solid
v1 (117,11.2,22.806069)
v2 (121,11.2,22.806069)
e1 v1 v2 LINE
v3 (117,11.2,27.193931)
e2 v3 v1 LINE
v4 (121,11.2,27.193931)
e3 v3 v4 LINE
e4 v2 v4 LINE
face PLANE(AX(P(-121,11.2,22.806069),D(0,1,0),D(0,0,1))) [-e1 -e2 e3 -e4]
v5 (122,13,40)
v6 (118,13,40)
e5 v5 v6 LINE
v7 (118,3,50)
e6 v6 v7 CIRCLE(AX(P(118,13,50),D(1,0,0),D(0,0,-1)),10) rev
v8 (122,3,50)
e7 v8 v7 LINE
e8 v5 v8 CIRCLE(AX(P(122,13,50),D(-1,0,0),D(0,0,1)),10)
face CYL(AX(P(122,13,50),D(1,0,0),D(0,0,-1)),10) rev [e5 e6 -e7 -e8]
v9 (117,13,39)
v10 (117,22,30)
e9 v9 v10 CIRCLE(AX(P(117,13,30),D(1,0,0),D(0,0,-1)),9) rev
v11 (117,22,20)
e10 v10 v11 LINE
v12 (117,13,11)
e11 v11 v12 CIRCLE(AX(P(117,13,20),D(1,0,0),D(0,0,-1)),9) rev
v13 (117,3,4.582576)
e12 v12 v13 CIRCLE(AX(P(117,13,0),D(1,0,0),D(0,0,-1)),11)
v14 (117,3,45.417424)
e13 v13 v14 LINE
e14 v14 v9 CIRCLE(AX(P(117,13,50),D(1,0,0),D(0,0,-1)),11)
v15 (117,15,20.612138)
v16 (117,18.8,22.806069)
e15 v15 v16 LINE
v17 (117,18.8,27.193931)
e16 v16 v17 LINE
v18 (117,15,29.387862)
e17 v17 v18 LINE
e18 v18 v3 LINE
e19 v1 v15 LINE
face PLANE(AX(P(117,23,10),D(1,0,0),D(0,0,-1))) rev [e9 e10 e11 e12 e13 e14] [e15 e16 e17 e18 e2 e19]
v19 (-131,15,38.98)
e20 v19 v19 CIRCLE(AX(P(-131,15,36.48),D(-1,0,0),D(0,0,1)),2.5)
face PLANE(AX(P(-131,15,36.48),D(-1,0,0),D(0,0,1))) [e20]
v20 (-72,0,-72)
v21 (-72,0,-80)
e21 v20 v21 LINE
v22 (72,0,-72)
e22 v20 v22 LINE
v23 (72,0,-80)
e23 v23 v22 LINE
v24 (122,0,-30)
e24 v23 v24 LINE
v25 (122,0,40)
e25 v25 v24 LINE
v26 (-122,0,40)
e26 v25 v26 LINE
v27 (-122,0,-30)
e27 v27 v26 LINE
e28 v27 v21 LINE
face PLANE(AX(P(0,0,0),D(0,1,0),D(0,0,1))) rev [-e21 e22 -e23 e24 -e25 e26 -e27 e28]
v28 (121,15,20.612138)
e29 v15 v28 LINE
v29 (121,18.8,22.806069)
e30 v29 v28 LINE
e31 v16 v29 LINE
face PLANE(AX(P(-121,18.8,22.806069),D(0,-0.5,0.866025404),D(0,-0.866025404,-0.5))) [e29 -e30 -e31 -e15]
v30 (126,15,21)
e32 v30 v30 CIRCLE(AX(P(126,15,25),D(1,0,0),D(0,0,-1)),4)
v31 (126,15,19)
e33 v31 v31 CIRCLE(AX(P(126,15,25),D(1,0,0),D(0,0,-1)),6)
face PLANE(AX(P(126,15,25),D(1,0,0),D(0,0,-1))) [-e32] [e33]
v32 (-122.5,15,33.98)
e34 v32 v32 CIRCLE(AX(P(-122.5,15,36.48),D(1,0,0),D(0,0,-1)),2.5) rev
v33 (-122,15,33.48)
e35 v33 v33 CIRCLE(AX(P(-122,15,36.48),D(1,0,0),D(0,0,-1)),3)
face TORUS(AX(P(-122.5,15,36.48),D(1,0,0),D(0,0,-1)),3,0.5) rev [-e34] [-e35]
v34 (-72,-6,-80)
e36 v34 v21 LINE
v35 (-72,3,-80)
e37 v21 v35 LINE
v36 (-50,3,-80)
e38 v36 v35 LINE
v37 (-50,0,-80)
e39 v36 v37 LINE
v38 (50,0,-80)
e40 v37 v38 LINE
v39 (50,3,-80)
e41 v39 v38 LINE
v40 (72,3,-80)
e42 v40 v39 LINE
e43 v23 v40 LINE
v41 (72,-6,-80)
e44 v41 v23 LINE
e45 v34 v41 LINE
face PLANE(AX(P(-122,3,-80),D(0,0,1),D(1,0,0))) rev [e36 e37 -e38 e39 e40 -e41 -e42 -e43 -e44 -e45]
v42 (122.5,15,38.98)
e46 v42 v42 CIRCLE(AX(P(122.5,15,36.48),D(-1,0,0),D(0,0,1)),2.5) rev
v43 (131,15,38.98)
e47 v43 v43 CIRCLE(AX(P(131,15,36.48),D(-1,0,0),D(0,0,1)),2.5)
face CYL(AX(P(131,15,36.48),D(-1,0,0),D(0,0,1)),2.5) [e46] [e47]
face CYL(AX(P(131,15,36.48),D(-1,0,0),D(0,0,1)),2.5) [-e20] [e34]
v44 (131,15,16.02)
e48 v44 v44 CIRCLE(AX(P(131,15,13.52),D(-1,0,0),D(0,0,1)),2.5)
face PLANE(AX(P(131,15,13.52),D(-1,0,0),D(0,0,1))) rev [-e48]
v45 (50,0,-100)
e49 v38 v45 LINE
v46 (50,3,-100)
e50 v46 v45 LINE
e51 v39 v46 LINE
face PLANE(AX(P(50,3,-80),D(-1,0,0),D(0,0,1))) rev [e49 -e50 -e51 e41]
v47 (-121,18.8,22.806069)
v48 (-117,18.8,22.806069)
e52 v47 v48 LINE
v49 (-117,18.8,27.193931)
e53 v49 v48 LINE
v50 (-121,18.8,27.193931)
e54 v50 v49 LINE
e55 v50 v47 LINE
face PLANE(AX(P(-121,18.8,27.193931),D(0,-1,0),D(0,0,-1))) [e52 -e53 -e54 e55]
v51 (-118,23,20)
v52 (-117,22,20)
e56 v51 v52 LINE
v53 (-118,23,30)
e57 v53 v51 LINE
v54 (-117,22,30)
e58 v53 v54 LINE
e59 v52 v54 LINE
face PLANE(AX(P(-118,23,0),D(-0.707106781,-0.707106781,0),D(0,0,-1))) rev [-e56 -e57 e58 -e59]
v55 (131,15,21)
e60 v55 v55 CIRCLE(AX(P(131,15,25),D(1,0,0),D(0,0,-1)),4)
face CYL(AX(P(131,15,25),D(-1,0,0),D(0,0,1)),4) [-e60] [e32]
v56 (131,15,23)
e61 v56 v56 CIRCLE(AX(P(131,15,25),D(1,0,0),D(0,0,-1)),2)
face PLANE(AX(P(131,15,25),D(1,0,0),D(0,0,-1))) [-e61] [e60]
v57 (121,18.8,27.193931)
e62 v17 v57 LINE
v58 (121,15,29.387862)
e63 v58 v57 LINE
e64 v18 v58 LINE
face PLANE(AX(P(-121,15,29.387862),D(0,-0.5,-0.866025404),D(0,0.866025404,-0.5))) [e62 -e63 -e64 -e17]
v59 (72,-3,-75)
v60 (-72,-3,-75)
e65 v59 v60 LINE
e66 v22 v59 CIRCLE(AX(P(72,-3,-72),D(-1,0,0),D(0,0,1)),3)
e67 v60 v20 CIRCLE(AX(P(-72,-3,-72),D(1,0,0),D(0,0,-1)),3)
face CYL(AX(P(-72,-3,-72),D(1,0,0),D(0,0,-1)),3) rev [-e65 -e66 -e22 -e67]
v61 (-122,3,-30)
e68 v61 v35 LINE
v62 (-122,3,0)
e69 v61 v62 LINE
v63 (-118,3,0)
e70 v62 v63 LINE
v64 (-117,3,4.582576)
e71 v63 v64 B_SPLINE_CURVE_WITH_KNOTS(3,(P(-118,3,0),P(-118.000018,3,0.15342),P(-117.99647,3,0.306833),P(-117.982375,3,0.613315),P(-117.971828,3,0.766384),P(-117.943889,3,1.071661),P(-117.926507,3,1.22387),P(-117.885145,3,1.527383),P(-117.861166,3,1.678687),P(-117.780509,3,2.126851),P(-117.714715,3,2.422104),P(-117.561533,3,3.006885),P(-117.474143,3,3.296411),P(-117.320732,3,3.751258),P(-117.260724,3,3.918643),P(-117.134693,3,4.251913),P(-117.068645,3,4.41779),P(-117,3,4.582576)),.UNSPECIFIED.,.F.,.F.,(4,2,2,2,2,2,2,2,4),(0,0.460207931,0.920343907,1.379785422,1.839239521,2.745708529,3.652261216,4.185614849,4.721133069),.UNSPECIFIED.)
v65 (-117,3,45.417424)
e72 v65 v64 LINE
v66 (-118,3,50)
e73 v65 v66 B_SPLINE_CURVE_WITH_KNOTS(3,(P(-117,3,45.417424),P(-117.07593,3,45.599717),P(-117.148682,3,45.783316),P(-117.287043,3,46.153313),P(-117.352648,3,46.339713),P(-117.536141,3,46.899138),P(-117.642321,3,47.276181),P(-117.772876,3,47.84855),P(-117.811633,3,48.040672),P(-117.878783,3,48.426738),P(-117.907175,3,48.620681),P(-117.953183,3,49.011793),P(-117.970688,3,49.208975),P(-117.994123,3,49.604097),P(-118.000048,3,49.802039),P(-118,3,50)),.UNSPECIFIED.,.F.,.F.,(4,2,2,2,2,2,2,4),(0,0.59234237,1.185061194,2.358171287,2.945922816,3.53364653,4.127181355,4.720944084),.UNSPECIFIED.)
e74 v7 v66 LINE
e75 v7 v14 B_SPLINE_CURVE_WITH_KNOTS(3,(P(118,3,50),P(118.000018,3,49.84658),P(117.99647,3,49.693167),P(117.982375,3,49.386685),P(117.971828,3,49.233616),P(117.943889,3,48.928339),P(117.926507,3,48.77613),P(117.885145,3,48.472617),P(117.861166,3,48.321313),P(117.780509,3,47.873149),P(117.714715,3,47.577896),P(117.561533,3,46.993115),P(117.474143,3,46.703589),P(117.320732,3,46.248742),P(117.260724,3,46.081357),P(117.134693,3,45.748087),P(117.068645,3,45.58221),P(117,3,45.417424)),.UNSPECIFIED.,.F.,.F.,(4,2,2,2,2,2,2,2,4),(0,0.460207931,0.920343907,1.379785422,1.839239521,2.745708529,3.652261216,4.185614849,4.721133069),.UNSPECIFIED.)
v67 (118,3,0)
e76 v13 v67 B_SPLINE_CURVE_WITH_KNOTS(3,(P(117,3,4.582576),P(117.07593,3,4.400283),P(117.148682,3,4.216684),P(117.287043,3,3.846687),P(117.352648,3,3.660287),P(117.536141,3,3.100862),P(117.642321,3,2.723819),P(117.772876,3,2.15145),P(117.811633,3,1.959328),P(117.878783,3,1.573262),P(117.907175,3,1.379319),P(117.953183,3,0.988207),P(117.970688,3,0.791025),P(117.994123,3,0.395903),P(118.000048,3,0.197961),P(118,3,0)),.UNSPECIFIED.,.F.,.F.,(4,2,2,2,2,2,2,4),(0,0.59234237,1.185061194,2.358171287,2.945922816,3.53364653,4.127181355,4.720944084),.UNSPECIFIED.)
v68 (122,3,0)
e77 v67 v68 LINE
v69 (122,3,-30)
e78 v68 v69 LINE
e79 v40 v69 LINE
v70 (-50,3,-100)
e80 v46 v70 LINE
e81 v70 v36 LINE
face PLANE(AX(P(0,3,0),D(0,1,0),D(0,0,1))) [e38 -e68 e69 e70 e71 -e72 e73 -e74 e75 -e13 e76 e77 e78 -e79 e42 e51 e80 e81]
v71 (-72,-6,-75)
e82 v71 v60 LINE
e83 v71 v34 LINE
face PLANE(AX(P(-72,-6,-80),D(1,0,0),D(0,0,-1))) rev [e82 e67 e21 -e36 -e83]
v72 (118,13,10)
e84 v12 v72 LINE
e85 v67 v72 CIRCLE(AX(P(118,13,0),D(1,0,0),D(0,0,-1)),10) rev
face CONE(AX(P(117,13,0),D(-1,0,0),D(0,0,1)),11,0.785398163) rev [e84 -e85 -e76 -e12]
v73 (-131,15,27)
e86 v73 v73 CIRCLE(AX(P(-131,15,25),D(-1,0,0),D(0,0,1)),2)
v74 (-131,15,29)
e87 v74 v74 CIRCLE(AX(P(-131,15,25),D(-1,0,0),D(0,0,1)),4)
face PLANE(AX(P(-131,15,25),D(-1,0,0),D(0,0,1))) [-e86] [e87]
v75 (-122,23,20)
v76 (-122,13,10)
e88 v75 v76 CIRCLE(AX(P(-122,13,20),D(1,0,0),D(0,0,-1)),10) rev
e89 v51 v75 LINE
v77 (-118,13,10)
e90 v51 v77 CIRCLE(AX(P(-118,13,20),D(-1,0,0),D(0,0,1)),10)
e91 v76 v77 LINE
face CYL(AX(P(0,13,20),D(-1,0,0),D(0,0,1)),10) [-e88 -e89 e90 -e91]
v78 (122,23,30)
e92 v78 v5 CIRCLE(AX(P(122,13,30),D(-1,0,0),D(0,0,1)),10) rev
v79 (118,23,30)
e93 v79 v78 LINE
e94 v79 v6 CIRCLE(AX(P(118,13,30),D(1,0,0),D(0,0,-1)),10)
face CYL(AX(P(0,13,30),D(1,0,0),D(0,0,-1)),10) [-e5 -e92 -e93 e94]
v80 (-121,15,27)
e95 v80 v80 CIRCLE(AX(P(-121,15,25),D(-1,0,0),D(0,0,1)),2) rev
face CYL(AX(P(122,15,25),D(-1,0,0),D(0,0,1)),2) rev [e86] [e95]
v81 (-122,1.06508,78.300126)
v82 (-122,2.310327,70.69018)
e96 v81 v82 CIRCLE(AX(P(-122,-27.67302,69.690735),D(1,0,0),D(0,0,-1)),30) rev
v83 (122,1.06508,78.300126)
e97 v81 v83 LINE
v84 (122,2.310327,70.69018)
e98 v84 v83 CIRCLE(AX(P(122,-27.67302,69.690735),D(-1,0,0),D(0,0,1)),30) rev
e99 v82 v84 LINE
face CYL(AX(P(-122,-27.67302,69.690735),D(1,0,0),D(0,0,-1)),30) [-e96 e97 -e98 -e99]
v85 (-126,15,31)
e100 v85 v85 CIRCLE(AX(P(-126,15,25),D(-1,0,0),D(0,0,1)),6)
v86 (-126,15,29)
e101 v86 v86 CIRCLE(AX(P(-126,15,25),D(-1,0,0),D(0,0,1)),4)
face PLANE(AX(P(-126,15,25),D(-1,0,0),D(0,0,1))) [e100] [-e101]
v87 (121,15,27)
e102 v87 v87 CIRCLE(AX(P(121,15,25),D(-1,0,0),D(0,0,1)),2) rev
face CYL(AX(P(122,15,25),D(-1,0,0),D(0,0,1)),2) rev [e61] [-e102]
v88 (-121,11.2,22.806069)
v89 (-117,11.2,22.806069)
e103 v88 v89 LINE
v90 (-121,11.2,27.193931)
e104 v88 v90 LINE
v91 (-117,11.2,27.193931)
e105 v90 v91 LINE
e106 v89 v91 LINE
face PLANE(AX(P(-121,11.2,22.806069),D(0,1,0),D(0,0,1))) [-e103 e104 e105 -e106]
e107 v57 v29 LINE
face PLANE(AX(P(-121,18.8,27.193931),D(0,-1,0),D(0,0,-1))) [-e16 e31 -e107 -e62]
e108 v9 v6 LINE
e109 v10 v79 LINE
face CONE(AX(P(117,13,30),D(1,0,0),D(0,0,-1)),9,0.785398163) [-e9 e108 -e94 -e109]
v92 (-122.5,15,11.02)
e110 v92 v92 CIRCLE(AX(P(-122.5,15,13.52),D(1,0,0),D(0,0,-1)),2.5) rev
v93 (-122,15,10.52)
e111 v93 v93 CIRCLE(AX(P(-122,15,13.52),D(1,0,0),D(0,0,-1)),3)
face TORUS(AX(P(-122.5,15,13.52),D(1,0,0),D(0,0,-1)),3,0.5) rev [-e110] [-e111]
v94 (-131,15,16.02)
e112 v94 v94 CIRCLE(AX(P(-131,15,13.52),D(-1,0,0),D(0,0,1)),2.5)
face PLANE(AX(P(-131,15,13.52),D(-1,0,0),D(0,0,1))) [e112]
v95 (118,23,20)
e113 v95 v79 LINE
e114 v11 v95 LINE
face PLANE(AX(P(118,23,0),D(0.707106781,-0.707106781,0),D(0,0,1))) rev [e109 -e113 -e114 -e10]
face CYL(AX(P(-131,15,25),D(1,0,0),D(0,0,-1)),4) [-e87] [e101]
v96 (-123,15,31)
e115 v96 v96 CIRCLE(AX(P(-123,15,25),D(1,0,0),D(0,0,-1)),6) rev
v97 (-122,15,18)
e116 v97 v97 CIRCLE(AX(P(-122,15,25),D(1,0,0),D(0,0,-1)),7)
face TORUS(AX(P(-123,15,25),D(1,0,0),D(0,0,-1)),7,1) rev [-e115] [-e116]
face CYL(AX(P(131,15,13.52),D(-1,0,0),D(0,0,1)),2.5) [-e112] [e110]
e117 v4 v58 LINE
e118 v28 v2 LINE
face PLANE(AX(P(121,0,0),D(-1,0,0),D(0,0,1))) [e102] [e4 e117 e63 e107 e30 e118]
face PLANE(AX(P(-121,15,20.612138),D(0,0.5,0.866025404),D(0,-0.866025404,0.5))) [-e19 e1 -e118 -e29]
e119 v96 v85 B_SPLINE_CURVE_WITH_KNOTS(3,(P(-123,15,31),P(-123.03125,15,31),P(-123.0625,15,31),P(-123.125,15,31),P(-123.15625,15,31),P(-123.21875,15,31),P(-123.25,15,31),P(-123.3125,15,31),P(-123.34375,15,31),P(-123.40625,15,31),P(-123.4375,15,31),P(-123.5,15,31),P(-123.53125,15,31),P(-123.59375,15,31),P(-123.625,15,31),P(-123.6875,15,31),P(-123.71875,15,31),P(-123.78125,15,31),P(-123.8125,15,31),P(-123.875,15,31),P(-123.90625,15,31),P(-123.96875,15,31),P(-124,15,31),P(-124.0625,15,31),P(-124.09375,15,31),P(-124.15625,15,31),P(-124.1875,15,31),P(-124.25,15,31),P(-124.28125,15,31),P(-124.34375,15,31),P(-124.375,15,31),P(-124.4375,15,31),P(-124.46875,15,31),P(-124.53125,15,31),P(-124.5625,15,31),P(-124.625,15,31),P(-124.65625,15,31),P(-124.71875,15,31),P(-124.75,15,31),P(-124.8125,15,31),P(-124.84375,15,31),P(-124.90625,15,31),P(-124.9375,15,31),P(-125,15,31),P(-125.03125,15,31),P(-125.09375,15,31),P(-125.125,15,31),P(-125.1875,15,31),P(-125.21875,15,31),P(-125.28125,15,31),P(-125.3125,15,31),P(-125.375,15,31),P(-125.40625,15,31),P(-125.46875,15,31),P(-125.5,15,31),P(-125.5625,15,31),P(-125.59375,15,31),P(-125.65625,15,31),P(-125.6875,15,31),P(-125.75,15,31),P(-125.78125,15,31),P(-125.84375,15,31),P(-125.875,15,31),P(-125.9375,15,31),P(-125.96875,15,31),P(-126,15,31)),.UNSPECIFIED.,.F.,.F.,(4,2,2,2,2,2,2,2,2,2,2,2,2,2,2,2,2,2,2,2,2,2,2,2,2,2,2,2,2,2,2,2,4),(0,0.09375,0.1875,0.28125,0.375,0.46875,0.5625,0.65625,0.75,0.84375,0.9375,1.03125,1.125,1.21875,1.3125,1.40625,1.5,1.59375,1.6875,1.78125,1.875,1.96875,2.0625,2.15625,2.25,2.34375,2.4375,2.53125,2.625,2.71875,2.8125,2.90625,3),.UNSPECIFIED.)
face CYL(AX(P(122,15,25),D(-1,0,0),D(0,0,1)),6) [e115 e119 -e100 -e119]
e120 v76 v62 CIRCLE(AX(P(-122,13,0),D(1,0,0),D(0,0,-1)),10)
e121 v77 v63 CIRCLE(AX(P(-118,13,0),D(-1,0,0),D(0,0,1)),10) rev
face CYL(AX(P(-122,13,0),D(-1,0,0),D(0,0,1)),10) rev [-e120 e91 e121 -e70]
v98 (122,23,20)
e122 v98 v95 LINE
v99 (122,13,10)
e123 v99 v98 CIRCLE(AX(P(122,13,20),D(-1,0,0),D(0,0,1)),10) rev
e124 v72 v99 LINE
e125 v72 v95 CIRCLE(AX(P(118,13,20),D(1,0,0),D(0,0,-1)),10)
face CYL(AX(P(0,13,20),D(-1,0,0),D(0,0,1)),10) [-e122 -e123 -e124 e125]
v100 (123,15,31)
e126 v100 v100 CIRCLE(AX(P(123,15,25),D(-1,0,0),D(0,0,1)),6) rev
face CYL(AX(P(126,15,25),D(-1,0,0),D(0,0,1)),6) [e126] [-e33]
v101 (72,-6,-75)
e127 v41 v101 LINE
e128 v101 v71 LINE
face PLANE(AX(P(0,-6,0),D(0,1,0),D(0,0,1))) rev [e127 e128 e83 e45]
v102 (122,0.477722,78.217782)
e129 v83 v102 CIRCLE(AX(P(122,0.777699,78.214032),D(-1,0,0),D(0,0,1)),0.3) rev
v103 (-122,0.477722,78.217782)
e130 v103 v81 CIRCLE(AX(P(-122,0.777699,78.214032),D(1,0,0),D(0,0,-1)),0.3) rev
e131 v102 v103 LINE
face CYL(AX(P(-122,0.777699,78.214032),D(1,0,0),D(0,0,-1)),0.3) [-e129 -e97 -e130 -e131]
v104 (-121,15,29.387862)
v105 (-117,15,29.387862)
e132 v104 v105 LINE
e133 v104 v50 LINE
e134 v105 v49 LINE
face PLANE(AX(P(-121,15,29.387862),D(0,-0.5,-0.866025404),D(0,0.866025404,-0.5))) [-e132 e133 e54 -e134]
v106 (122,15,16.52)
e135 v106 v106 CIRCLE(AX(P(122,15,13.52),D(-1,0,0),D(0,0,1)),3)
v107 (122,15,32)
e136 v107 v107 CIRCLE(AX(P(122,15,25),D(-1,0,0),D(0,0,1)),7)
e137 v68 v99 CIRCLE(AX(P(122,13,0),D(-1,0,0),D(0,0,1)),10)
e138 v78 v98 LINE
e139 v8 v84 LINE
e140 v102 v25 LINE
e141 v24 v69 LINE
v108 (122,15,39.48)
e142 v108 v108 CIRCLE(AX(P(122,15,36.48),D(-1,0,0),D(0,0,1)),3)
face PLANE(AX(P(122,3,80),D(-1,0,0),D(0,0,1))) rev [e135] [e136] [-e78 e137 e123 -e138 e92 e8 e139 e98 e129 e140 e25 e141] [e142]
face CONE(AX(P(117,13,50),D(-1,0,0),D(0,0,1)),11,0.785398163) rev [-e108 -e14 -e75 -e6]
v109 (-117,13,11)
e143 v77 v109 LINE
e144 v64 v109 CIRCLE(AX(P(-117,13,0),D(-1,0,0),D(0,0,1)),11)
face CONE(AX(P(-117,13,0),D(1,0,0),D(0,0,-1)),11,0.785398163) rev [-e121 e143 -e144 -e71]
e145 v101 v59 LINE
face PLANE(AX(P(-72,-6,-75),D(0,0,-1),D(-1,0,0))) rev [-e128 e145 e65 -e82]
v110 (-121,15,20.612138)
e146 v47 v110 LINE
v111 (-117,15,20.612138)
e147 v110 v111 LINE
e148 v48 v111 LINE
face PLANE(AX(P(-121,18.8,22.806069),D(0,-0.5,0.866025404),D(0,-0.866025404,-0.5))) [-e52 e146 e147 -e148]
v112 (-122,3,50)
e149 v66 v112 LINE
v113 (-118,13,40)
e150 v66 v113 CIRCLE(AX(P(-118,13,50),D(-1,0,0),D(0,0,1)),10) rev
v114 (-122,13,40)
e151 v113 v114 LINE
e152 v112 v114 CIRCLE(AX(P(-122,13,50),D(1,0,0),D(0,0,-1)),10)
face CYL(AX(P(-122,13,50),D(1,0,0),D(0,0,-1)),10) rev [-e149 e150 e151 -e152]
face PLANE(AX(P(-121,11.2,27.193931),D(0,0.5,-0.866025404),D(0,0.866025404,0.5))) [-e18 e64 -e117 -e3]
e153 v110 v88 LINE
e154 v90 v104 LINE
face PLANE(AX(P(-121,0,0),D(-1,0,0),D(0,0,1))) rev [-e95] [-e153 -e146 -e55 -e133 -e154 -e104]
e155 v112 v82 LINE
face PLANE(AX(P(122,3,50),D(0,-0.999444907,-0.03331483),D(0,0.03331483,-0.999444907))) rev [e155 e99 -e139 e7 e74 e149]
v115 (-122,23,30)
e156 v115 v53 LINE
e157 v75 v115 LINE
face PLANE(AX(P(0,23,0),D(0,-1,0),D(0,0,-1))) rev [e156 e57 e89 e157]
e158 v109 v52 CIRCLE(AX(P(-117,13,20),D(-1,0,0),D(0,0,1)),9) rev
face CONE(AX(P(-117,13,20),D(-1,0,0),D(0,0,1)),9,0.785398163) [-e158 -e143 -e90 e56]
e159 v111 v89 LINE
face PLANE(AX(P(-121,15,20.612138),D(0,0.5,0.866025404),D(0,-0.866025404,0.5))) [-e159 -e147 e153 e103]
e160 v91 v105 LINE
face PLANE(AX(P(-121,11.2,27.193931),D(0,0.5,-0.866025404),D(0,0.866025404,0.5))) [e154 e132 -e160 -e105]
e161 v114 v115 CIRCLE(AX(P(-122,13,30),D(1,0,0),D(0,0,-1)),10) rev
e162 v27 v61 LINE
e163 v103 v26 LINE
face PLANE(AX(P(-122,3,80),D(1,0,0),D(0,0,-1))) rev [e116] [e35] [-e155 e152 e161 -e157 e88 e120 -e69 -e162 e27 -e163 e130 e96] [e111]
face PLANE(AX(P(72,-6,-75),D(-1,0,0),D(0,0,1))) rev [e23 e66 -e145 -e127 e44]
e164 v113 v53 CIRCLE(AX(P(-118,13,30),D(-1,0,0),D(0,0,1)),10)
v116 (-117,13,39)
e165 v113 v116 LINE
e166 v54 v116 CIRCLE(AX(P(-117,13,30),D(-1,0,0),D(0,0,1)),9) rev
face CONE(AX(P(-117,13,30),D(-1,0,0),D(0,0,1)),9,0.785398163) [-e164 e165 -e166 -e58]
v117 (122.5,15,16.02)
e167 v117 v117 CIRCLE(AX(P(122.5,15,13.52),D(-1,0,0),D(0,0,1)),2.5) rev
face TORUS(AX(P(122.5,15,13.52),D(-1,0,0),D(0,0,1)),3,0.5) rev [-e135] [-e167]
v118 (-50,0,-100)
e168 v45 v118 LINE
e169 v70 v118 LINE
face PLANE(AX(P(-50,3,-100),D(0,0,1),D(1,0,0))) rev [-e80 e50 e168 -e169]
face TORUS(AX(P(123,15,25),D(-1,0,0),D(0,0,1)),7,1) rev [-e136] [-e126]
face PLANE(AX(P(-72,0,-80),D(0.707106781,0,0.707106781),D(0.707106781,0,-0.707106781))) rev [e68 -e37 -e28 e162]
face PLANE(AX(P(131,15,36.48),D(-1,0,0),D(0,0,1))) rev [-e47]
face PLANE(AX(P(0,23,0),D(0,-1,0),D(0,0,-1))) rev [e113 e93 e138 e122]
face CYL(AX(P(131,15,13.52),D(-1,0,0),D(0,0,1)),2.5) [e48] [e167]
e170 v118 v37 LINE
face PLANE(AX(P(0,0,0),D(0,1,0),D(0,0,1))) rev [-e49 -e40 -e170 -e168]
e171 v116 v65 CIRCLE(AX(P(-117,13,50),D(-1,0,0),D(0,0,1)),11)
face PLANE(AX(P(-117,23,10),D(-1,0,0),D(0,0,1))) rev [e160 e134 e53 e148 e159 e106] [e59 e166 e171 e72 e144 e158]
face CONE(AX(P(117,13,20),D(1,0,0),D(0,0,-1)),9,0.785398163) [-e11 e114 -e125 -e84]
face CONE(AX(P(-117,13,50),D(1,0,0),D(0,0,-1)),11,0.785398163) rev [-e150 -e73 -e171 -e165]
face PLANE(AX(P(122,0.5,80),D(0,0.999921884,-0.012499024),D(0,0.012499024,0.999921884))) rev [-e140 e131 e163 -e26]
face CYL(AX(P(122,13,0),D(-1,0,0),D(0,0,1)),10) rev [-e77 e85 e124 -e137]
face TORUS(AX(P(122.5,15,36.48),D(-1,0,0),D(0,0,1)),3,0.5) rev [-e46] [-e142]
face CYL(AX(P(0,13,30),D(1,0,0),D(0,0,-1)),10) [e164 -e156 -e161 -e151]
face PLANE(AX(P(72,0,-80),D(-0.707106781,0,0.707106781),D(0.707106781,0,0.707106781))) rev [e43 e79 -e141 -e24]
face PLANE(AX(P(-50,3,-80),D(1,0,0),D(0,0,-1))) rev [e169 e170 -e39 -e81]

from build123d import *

# Parameters (mm, degrees)
BOSS_EXTRUDE1_DEPTH       = 3
SKETCH2_W                 = 5
SKETCH2_H                 = 30
BOSS_EXTRUDE2_DEPTH       = 20
BOSS_EXTRUDE3_DEPTH       = 4
BOSS_EXTRUDE3_DEPTH_BACK  = 244
SKETCH3_R                 = 6
SKETCH5_R                 = 2
CUT_EXTRUDE2_DEPTH        = 269.389642125
FILLET1_R                 = 10
BOSS_EXTRUDE4_START       = 5
SKETCH6_R                 = 4
SKETCH6_R_2               = 2
BOSS_EXTRUDE4_DEPTH       = 5
CUT_EXTRUDE3_DEPTH        = 238
CUT_EXTRUDE3_DEPTH_BACK   = 4
CUT_EXTRUDE4_DEPTH        = 265.697941057
FILLET9_R                 = 30
FILLET10_R                = 0.3
CUT_EXTRUDE6_DEPTH        = 167.015059558
SKETCH13_R                = 6
SKETCH13_R_2              = 2
BOSS_EXTRUDE7_DEPTH       = 4
SKETCH14_R                = 4
SKETCH14_R_2              = 2
BOSS_EXTRUDE8_DEPTH       = 5
FILLET11_R                = 1
SKETCH15_W                = 144
SKETCH15_H                = 5
BOSS_EXTRUDE9_DEPTH       = 6
FILLET12_R                = 3
BOSS_EXTRUDE10_DEPTH      = 9
BOSS_EXTRUDE10_DEPTH_BACK = 253
SKETCH16_R                = 2.5
FILLET13_R                = 0.5
CUT_EXTRUDE7_DEPTH        = 167.403124971
CUT_EXTRUDE7_DEPTH_BACK   = 167.403124971
SKETCH17_W                = 234
SKETCH17_H                = 22.465273377
CHAMFER1_SIZE             = 1


# Some blends are built 0.0001 mm under size
with BuildPart() as part:
    # Sketch1 → Boss-Extrude1 (new body)
    with BuildSketch(Plane(origin=(0, 0, 0), x_dir=(1, 0, 0), z_dir=(0, 1, 0))):
        Polygon((-122, -80), (122, -80), (122, 80), (50, 80), (50, 100), (-50, 100), (-50, 80), (-122, 80), align=None)
    extrude(amount=BOSS_EXTRUDE1_DEPTH)

    # Sketch2 → Boss-Extrude2 (add)
    with BuildSketch(Plane(origin=(0, 3, 0), x_dir=(1, 0, 0), z_dir=(0, 1, 0))):
        with Locations((-119.5, -25)):
            Rectangle(SKETCH2_W, SKETCH2_H)
        with Locations((119.5, -25)):
            Rectangle(SKETCH2_W, SKETCH2_H)
    extrude(amount=BOSS_EXTRUDE2_DEPTH)

    # Sketch3 → Boss-Extrude3 (add, two sides: drawn at the far end of the back side and taken through both)
    with BuildSketch(Plane.ZY.offset(122).offset(-BOSS_EXTRUDE3_DEPTH_BACK)):
        with Locations((25, 15)):
            Circle(SKETCH3_R)
    extrude(amount=BOSS_EXTRUDE3_DEPTH + BOSS_EXTRUDE3_DEPTH_BACK)

    # Sketch5 → Cut-Extrude2 (cut, through all)
    with BuildSketch(Plane.ZY.offset(126)):
        with Locations((25, 15)):
            Circle(SKETCH5_R)
    extrude(amount=-CUT_EXTRUDE2_DEPTH, mode=Mode.SUBTRACT)

    # Fillet1
    fillet1_edges = [part.edges().sort_by_distance(p)[0] for p in [
        (119.5, 3, 40),
        (119.5, 3, 10),
        (-119.5, 3, 10),
        (-119.5, 3, 40),
    ]]
    fillet(fillet1_edges, radius=FILLET1_R)
    fillet1_2_edges = [part.edges().sort_by_distance(p)[0] for p in [
        (119.5, 23, 40),
        (119.5, 23, 10),
        (-119.5, 23, 10),
        (-119.5, 23, 40),
    ]]
    fillet(fillet1_2_edges, radius=FILLET1_R - 0.0001)  # a hair under: the kernel refuses the full size

    # Sketch6 → Boss-Extrude4 (add)
    with BuildSketch(Plane.ZY.offset(126).offset(BOSS_EXTRUDE4_START)):
        with Locations((25, 15)):
            Circle(SKETCH6_R)
        with Locations((25, 15)):
            Circle(SKETCH6_R_2, mode=Mode.SUBTRACT)
    extrude(amount=-BOSS_EXTRUDE4_DEPTH)

    # Sketch8 → Cut-Extrude3 (cut, two sides: drawn at the far end of the back side and taken through both)
    with BuildSketch(Plane.ZY.offset(-117).offset(-CUT_EXTRUDE3_DEPTH_BACK)):
        Polygon((29.387862046, 15), (27.193931023, 18.8), (22.806068977, 18.8), (20.612137954, 15), (22.806068977, 11.2), (27.193931023, 11.2), align=None)
    extrude(amount=CUT_EXTRUDE3_DEPTH + CUT_EXTRUDE3_DEPTH_BACK, mode=Mode.SUBTRACT)

    # Sketch9 → Cut-Extrude4 (cut, through all)
    with BuildSketch(Plane.ZY.offset(122)):
        Polygon((40, 0), (80, 0), (80, 0.5), align=None)
        Polygon((50, 3), (80, 2), (80, 3), align=None)
    extrude(amount=-CUT_EXTRUDE4_DEPTH, mode=Mode.SUBTRACT)

    # Fillet9
    # the kernel refuses this fillet: 30 mm, written as the material it takes off along each edge
    with BuildSketch(Plane(origin=(-145.287477803, 2, 80), x_dir=(0, -1.0, -1.3358203432240998e-12), z_dir=(1, 0, 0))) as fillet9_piece_1:
        with BuildLine():
            CenterArc((29.673019862, 10.309265341), FILLET9_R, 181.909152433, 18.189778856)
            Line((-0.310327348, 9.309820434), (-0.909994292, 9.289831536))
            Line((-0.909994292, 9.289831536), (-0.599666944, -0.019988898))
            Line((-0.599666944, -0.019988898), (0, -0.6))
            ThreePointArc((0, -0.6), (0.75, -0.6), (0.936539603, -0.206185307))
            Line((0.936539603, -0.206185307), (1.5, 0))
        make_face()
    extrude(amount=290.574955605, mode=Mode.SUBTRACT)

    # Fillet10
    fillet10_edges = [part.edges().sort_by_distance(p)[0] for p in [
        (0, 0.5, 80),
    ]]
    fillet(fillet10_edges, radius=FILLET10_R)

    # Sketch12 → Cut-Extrude6 (cut, through all)
    with BuildSketch(Plane(origin=(0, 3, 0), x_dir=(1, 0, 0), z_dir=(0, 1, 0))):
        Polygon((-72, 80), (-122, 30), (-122, 80), align=None)
        Polygon((72, 80), (122, 80), (122, 30), align=None)
    extrude(amount=-CUT_EXTRUDE6_DEPTH, mode=Mode.SUBTRACT)

    # Sketch13 → Boss-Extrude7 (add)
    with BuildSketch(Plane(origin=(122, 0, 0), x_dir=(0, 0, -1), z_dir=(1, 0, 0))):
        with Locations(Location((-25, 15, 0), (0, 0, 180))):
            Circle(SKETCH13_R)
        with Locations(Location((-25, 15, 0), (0, 0, 180))):
            Circle(SKETCH13_R_2, mode=Mode.SUBTRACT)
    extrude(amount=BOSS_EXTRUDE7_DEPTH)

    # Sketch14 → Boss-Extrude8 (add)
    with BuildSketch(Plane(origin=(126, 0, 0), x_dir=(0, 0, -1), z_dir=(1, 0, 0))):
        with Locations(Location((-25, 15, 0), (0, 0, 180))):
            Circle(SKETCH14_R)
        with Locations(Location((-25, 15, 0), (0, 0, 180))):
            Circle(SKETCH14_R_2, mode=Mode.SUBTRACT)
    extrude(amount=BOSS_EXTRUDE8_DEPTH)

    # Fillet11
    fillet11_edges = [part.edges().sort_by_distance(p)[0] for p in [
        (122, 15, 19),
        (-122, 15, 19),
    ]]
    fillet(fillet11_edges, radius=FILLET11_R)

    # Sketch15 → Boss-Extrude9 (add)
    with BuildSketch(Plane.XZ):
        with Locations((0, -77.5)):
            Rectangle(SKETCH15_W, SKETCH15_H)
    extrude(amount=BOSS_EXTRUDE9_DEPTH)

    # Fillet12
    fillet12_edges = [part.edges().sort_by_distance(p)[0] for p in [
        (0, 0, -75),
    ]]
    fillet(fillet12_edges, radius=FILLET12_R)

    # Sketch16 → Boss-Extrude10 (add, two sides: drawn at the far end of the back side and taken through both)
    with BuildSketch(Plane.ZY.offset(122).offset(-BOSS_EXTRUDE10_DEPTH_BACK)):
        with Locations((36.48, 15)):
            Circle(SKETCH16_R)
        with Locations((13.52, 15)):
            Circle(SKETCH16_R)
    extrude(amount=BOSS_EXTRUDE10_DEPTH + BOSS_EXTRUDE10_DEPTH_BACK)

    # Fillet13
    fillet13_edges = [part.edges().sort_by_distance(p)[0] for p in [
        (-122, 15, 33.98),
        (122, 15, 33.98),
        (-122, 15, 11.02),
        (122, 15, 11.02),
    ]]
    fillet(fillet13_edges, radius=FILLET13_R)

    # Sketch17 → Cut-Extrude7 (cut, two sides: drawn at the far end of the back side and taken through both)
    with BuildSketch(Plane.XY.offset(-CUT_EXTRUDE7_DEPTH_BACK)):
        with Locations((0, 16.231336637)):
            Rectangle(SKETCH17_W, SKETCH17_H)
    extrude(amount=CUT_EXTRUDE7_DEPTH + CUT_EXTRUDE7_DEPTH_BACK, mode=Mode.SUBTRACT)

    # Chamfer1
    # the kernel refuses this chamfer: 1 mm, written as the material it takes off along each edge
    with BuildSketch(Plane(origin=(117, 23, 19.9999), x_dir=(-0.0274958766105822, -0.999621916911297, 0), z_dir=(0, 0, 1)), Plane(origin=(-117, 23, 30.0001), x_dir=(0.0274958766105822, -0.999621916911297, 0), z_dir=(0, 0, -1))) as chamfer1_piece_1:
        Polygon((CHAMFER1_SIZE * 0.999621916911, CHAMFER1_SIZE * 0.0274958766106), (-CHAMFER1_SIZE * 0.0274958766106, CHAMFER1_SIZE * 0.999621916911), (0, 0), align=None)
    extrude(amount=10.0002, mode=Mode.SUBTRACT)
    with BuildSketch(Plane(origin=(117, 13.0001, 19.9999), x_dir=(0, 0, -1), z_dir=(0, -1, 0))) as chamfer1_piece_2:
        Polygon((9.9999 - CHAMFER1_SIZE, 0), (9.9999, CHAMFER1_SIZE), (9.9999, 0), align=None)
    revolve(axis=Axis((117, 13.0001, 19.9999), (1, 0, 0)), revolution_arc=90, mode=Mode.SUBTRACT)
    with BuildSketch(Plane(origin=(117, 13.0001, 30.0001), x_dir=(0, 1, 0), z_dir=(0, 0, -1))) as chamfer1_piece_3:
        Polygon((9.9999 - CHAMFER1_SIZE, 0), (9.9999, CHAMFER1_SIZE), (9.9999, 0), align=None)
    revolve(axis=Axis((117, 13.0001, 30.0001), (1, 0, 0)), revolution_arc=90, mode=Mode.SUBTRACT)
    with BuildSketch(Plane(origin=(-117, 13.0001, 30.0001), x_dir=(0, 0, 1), z_dir=(0, -1, 0))) as chamfer1_piece_4:
        Polygon((9.9999 - CHAMFER1_SIZE, 0), (9.9999, CHAMFER1_SIZE), (9.9999, 0), align=None)
    revolve(axis=Axis((-117, 13.0001, 30.0001), (-1, 0, 0)), revolution_arc=90, mode=Mode.SUBTRACT)
    with BuildSketch(Plane(origin=(-117, 13.0001, 19.9999), x_dir=(0, 1, 0), z_dir=(0, 0, 1))) as chamfer1_piece_5:
        Polygon((9.9999 - CHAMFER1_SIZE, 0), (9.9999, CHAMFER1_SIZE), (9.9999, 0), align=None)
    revolve(axis=Axis((-117, 13.0001, 19.9999), (-1, 0, 0)), revolution_arc=90, mode=Mode.SUBTRACT)
    with BuildSketch(Plane(origin=(117, 13, 50), x_dir=(0, 0, -1), z_dir=(0, 1, 0))) as chamfer1_piece_6_section:
        Polygon((10 + CHAMFER1_SIZE, 0), (10, -CHAMFER1_SIZE), (10, 0), align=None)
    chamfer1_piece_6 = revolve(axis=Axis((117, 13, 50), (-1, 0, 0)), revolution_arc=104.740577178, mode=Mode.PRIVATE)
    chamfer1_piece_6 = split(chamfer1_piece_6, bisect_by=Plane(origin=(117.284199565, 3, 39.712776606), z_dir=(0, 1, 0)), keep=Keep.TOP, mode=Mode.PRIVATE)
    add(chamfer1_piece_6, mode=Mode.SUBTRACT)
    with BuildSketch(Plane(origin=(117, 13, 0), x_dir=(2.842170943040401e-15, -0.9670877974864588, -0.25444290509422757), z_dir=(1.1455930525457092e-14, 0.25444290509422757, -0.9670877974864588))) as chamfer1_piece_7_section:
        Polygon((10 + CHAMFER1_SIZE, 0), (10, -CHAMFER1_SIZE), (10, 0), align=None)
    chamfer1_piece_7 = revolve(axis=Axis((117, 13, 0), (-1, 0, 0)), revolution_arc=104.740577178, mode=Mode.PRIVATE)
    chamfer1_piece_7 = split(chamfer1_piece_7, bisect_by=Plane(origin=(117.487389682, 3, 7.415704361), z_dir=(0, 1, 0)), keep=Keep.TOP, mode=Mode.PRIVATE)
    add(chamfer1_piece_7, mode=Mode.SUBTRACT)
    with BuildSketch(Plane(origin=(-117, 13, 0), x_dir=(0, 0, 1), z_dir=(0, 1, 0))) as chamfer1_piece_8_section:
        Polygon((10 + CHAMFER1_SIZE, 0), (10, -CHAMFER1_SIZE), (10, 0), align=None)
    chamfer1_piece_8 = revolve(axis=Axis((-117, 13, 0), (1, 0, 0)), revolution_arc=104.740577178, mode=Mode.PRIVATE)
    chamfer1_piece_8 = split(chamfer1_piece_8, bisect_by=Plane(origin=(-117.284199565, 3, 10.287223394), z_dir=(0, 1, 0)), keep=Keep.TOP, mode=Mode.PRIVATE)
    add(chamfer1_piece_8, mode=Mode.SUBTRACT)
    with BuildSketch(Plane(origin=(-117, 13, 50), x_dir=(0, -0.9670877974864587, 0.2544429050942284), z_dir=(0, 0.2544429050942284, 0.9670877974864587))) as chamfer1_piece_9_section:
        Polygon((10 + CHAMFER1_SIZE, 0), (10, -CHAMFER1_SIZE), (10, 0), align=None)
    chamfer1_piece_9 = revolve(axis=Axis((-117, 13, 50), (1, 0, 0)), revolution_arc=104.740577178, mode=Mode.PRIVATE)
    chamfer1_piece_9 = split(chamfer1_piece_9, bisect_by=Plane(origin=(-117.335701198, 3, 47.436770864), z_dir=(0, 1, 0)), keep=Keep.TOP, mode=Mode.PRIVATE)
    add(chamfer1_piece_9, mode=Mode.SUBTRACT)
    with BuildSketch(Plane(origin=(-117, 13, 40), x_dir=(0.027495876610582105, 0, -0.999621916911297), z_dir=(0, 1, 0)), Plane(origin=(117, 13, 10), x_dir=(-0.0274958766105822, 0, 0.999621916911297), z_dir=(0, 1, 0))) as chamfer1_piece_10:
        Polygon((CHAMFER1_SIZE * 0.999621916911, CHAMFER1_SIZE * 0.0274958766106), (-CHAMFER1_SIZE * 0.0274958766106, CHAMFER1_SIZE * 0.999621916911), (0, 0), align=None)
    extrude(amount=0.0001, mode=Mode.SUBTRACT)
    with BuildSketch(Plane(origin=(-117, 13, 10), x_dir=(0.027495876610582247, 0, 0.999621916911297), z_dir=(0, 1, 0)), Plane(origin=(117, 13, 40), x_dir=(-0.027495876610582105, 0, -0.999621916911297), z_dir=(0, 1, 0))) as chamfer1_piece_11:
        Polygon((CHAMFER1_SIZE * 0.999621916911, -CHAMFER1_SIZE * 0.0274958766106), (-CHAMFER1_SIZE * 0.0274958766106, -CHAMFER1_SIZE * 0.999621916911), (0, 0), align=None)
    extrude(amount=0.0001, mode=Mode.SUBTRACT)


solid = part.part
